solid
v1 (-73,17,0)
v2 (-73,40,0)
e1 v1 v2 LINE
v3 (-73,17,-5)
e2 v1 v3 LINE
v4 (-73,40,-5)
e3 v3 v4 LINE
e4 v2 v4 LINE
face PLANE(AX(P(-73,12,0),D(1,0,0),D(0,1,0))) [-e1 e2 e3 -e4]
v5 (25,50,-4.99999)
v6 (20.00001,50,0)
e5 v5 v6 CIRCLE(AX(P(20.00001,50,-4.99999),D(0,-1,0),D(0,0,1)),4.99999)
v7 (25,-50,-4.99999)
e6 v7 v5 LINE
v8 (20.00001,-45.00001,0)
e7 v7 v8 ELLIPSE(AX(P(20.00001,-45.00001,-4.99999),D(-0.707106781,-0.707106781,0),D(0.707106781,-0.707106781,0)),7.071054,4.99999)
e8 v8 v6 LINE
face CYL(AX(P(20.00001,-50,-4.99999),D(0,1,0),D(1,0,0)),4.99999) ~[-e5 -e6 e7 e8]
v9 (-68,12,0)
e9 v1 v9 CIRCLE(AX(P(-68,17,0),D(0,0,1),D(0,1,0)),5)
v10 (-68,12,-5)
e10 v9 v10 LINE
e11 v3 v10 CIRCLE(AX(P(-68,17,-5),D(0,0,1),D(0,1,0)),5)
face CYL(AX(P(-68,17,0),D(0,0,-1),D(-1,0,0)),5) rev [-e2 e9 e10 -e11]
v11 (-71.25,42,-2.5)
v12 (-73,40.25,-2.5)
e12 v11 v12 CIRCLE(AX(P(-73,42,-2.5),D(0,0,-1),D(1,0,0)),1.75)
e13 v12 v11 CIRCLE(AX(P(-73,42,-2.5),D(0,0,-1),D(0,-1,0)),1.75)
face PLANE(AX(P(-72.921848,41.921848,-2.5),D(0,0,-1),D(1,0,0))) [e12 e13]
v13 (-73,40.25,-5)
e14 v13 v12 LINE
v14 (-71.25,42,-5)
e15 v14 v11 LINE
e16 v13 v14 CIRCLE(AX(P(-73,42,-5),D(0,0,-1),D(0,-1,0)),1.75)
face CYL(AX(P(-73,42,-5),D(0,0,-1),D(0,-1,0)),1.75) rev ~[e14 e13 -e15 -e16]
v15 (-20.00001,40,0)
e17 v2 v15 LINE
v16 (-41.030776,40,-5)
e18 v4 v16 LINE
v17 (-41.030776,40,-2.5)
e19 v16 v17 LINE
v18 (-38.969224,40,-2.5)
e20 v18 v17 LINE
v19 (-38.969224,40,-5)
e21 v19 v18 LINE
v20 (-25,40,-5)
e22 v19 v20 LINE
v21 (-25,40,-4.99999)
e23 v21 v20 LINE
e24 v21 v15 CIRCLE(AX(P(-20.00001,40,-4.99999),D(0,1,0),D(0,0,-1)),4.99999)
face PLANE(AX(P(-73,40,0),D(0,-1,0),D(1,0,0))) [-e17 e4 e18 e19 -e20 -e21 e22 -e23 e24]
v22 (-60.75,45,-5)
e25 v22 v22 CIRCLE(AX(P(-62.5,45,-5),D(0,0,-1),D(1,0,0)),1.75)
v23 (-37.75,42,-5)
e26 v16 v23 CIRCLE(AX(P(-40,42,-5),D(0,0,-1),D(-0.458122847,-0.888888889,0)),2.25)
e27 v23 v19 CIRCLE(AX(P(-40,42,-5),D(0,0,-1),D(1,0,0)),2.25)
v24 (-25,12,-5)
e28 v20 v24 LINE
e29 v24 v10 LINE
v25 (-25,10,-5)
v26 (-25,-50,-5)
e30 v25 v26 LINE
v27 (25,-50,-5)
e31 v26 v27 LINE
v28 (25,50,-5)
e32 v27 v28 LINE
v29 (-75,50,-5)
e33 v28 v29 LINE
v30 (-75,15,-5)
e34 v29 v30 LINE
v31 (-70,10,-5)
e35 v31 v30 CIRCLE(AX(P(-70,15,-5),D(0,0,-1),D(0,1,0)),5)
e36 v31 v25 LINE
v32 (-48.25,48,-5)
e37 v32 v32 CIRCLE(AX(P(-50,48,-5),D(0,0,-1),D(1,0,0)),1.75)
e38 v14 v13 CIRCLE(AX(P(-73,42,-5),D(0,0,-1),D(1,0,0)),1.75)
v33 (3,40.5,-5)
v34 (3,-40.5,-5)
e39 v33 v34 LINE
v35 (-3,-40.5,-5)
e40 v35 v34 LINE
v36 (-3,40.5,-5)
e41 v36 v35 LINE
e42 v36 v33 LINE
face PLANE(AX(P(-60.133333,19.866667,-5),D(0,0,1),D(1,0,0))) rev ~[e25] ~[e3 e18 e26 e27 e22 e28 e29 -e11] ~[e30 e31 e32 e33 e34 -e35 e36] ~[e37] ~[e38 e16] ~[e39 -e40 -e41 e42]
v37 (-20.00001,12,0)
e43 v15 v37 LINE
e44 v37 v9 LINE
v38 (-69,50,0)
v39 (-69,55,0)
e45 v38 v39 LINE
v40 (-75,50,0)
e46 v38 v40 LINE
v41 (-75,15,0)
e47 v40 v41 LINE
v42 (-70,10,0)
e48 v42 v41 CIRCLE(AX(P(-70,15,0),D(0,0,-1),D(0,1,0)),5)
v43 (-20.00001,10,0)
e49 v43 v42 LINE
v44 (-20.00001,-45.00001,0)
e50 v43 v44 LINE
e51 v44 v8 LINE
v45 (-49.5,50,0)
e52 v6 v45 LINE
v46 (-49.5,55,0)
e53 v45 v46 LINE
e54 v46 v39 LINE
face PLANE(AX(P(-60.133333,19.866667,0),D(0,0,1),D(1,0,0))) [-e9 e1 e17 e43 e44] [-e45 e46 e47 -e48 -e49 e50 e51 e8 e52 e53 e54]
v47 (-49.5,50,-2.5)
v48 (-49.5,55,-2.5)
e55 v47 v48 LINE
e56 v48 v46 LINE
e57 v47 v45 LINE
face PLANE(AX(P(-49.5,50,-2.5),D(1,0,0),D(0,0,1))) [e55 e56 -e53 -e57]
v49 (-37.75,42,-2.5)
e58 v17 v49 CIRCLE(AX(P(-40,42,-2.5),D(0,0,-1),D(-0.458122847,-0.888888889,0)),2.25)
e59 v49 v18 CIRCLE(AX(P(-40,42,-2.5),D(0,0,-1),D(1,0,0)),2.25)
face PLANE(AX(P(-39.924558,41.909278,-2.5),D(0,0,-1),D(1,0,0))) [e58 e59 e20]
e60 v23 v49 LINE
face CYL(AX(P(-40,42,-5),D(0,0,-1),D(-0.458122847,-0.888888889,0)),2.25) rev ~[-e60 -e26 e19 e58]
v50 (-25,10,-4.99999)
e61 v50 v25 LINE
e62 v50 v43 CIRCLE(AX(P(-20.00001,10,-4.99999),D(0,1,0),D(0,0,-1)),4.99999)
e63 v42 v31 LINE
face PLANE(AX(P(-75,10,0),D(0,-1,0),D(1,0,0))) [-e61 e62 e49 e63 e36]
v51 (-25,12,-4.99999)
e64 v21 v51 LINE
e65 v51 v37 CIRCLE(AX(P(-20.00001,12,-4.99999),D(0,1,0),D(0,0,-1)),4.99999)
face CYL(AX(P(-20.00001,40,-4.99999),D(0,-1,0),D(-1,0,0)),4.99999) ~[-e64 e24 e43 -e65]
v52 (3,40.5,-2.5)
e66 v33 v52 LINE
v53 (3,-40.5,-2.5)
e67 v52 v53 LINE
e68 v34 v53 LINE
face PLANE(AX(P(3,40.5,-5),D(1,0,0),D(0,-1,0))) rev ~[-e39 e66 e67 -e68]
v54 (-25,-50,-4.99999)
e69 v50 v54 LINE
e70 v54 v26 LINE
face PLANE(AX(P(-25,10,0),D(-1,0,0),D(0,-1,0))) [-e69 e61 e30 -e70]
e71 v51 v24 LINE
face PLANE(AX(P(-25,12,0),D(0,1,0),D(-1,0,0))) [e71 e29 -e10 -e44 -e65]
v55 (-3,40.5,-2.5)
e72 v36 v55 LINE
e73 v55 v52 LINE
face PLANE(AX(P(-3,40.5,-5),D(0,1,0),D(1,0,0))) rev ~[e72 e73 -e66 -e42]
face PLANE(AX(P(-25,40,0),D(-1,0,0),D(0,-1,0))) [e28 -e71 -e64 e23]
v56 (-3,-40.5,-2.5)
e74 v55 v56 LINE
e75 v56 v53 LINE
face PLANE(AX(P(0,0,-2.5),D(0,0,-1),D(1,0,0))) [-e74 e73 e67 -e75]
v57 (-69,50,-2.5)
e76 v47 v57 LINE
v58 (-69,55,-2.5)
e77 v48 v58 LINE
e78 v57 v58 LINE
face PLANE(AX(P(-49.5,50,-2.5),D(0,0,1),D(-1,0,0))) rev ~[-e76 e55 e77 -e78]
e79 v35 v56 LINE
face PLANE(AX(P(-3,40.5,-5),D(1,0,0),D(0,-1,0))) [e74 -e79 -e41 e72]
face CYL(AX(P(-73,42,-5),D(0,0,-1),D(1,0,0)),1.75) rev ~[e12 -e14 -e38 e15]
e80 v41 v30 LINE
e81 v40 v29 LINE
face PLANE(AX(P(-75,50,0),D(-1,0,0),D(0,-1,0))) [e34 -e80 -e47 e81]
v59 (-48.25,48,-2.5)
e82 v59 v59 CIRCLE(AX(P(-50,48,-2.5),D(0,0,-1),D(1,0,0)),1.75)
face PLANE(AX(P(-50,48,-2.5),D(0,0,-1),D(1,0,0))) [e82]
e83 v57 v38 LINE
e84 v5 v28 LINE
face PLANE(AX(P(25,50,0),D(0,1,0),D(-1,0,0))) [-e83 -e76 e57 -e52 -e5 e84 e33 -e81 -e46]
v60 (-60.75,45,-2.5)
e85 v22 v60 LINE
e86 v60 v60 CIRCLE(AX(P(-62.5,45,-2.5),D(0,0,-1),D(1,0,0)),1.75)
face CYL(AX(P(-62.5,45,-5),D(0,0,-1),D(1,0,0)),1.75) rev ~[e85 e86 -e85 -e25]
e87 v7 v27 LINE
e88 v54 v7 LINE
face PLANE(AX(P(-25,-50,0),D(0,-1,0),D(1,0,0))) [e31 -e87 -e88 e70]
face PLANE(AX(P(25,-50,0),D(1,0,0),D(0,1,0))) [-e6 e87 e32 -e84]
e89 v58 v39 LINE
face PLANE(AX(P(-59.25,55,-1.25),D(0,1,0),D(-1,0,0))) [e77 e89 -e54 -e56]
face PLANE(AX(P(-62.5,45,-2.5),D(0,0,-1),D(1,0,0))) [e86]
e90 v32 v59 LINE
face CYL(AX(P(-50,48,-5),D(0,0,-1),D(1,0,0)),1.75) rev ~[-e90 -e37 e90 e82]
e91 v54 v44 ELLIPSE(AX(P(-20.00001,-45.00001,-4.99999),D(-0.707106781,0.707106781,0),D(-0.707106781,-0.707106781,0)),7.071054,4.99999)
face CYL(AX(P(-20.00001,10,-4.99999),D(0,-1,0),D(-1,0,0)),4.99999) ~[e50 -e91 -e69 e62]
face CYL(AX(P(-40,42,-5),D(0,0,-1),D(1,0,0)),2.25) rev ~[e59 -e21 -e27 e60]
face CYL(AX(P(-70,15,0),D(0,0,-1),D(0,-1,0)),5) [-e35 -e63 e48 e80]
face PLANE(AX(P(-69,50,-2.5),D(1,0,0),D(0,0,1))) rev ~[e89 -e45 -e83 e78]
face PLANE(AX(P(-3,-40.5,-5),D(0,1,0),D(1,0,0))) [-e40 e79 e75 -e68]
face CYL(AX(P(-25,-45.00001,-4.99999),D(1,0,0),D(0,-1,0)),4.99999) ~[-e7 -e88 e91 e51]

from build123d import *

# Parameters (mm, degrees)
F0_W     = 48
F0_H     = 10
F1_DEPTH = 5
F2_R     = 4.99999
F3_R     = 5
F4_W     = 6
F4_H     = 81
F4_R     = 1.75
F5_DEPTH = 2.5
F6_W     = 19.5
F6_H     = 2.5
F7_DEPTH = 5


# Not quite as in the source:
# - a fillet or chamfer is up to 0.001 mm smaller than in the source, because OpenCascade refuses the exact size


with BuildPart() as f1:
    # F0 (on Top) → F1 (new body)
    with BuildSketch(Plane.XY):
        Polygon((-73, 40), (-73, 50), (-75, 50), (-75, 10), (-25, 10), (-25, 12), (-73, 12), align=None)
        Polygon((25, -50), (25, 50), (-25, 50), (-25, 40), (-25, 12), (-25, 10), (-25, -50), align=None)
        with Locations((-49, 45)):
            Rectangle(F0_W, F0_H)
    extrude(amount=-F1_DEPTH)

    # F2 (radius 5 in the source; OpenCascade refuses exactly that, so slightly less here)
    f2_edges = [f1.edges().sort_by_distance(p)[0] for p in [
        (-25, -20, 0),
        (0, -50, 0),
        (25, 0, 0),
        (-25, 26, 0),
    ]]
    fillet(f2_edges, radius=F2_R)

    # F3
    f3_edges = [f1.edges().sort_by_distance(p)[0] for p in [
        (-73, 12, -2.5),
        (-75, 10, -2.5),
    ]]
    fillet(f3_edges, radius=F3_R)

    # F4 (on face) → F5 (cut)
    with BuildSketch(Plane(origin=(0, 0, -5), x_dir=(1, 0, 0), z_dir=(0, 0, -1))):
        Rectangle(F4_W, F4_H)
        with BuildLine():
            ThreePointArc((-41.0307764064, -40), (-41.1711646096, -43.9211646096), (-37.75, -42))
            ThreePointArc((-37.75, -42), (-38.0788353904, -40.8288353904), (-38.9692235936, -40))
            Line((-38.9692235936, -40), (-41.0307764064, -40))
        make_face()
        with Locations((-50, -48)):
            Circle(F4_R)
        with Locations((-62.5, -45)):
            Circle(F4_R)
        with BuildLine():
            ThreePointArc((-71.25, -42), (-71.7625631329, -40.7625631329), (-73, -40.25))
            ThreePointArc((-73, -40.25), (-74.2374368671, -43.2374368671), (-71.25, -42))
        make_face()
    extrude(amount=-F5_DEPTH, mode=Mode.SUBTRACT)

    # F6 (on face) → F7 (join)
    with BuildSketch(Plane(origin=(0, 50, 0), x_dir=(-1, 0, 0), z_dir=(0, 1, 0))):
        with Locations((59.25, -1.25)):
            Rectangle(F6_W, F6_H)
    extrude(amount=F7_DEPTH)


solid = f1.part
